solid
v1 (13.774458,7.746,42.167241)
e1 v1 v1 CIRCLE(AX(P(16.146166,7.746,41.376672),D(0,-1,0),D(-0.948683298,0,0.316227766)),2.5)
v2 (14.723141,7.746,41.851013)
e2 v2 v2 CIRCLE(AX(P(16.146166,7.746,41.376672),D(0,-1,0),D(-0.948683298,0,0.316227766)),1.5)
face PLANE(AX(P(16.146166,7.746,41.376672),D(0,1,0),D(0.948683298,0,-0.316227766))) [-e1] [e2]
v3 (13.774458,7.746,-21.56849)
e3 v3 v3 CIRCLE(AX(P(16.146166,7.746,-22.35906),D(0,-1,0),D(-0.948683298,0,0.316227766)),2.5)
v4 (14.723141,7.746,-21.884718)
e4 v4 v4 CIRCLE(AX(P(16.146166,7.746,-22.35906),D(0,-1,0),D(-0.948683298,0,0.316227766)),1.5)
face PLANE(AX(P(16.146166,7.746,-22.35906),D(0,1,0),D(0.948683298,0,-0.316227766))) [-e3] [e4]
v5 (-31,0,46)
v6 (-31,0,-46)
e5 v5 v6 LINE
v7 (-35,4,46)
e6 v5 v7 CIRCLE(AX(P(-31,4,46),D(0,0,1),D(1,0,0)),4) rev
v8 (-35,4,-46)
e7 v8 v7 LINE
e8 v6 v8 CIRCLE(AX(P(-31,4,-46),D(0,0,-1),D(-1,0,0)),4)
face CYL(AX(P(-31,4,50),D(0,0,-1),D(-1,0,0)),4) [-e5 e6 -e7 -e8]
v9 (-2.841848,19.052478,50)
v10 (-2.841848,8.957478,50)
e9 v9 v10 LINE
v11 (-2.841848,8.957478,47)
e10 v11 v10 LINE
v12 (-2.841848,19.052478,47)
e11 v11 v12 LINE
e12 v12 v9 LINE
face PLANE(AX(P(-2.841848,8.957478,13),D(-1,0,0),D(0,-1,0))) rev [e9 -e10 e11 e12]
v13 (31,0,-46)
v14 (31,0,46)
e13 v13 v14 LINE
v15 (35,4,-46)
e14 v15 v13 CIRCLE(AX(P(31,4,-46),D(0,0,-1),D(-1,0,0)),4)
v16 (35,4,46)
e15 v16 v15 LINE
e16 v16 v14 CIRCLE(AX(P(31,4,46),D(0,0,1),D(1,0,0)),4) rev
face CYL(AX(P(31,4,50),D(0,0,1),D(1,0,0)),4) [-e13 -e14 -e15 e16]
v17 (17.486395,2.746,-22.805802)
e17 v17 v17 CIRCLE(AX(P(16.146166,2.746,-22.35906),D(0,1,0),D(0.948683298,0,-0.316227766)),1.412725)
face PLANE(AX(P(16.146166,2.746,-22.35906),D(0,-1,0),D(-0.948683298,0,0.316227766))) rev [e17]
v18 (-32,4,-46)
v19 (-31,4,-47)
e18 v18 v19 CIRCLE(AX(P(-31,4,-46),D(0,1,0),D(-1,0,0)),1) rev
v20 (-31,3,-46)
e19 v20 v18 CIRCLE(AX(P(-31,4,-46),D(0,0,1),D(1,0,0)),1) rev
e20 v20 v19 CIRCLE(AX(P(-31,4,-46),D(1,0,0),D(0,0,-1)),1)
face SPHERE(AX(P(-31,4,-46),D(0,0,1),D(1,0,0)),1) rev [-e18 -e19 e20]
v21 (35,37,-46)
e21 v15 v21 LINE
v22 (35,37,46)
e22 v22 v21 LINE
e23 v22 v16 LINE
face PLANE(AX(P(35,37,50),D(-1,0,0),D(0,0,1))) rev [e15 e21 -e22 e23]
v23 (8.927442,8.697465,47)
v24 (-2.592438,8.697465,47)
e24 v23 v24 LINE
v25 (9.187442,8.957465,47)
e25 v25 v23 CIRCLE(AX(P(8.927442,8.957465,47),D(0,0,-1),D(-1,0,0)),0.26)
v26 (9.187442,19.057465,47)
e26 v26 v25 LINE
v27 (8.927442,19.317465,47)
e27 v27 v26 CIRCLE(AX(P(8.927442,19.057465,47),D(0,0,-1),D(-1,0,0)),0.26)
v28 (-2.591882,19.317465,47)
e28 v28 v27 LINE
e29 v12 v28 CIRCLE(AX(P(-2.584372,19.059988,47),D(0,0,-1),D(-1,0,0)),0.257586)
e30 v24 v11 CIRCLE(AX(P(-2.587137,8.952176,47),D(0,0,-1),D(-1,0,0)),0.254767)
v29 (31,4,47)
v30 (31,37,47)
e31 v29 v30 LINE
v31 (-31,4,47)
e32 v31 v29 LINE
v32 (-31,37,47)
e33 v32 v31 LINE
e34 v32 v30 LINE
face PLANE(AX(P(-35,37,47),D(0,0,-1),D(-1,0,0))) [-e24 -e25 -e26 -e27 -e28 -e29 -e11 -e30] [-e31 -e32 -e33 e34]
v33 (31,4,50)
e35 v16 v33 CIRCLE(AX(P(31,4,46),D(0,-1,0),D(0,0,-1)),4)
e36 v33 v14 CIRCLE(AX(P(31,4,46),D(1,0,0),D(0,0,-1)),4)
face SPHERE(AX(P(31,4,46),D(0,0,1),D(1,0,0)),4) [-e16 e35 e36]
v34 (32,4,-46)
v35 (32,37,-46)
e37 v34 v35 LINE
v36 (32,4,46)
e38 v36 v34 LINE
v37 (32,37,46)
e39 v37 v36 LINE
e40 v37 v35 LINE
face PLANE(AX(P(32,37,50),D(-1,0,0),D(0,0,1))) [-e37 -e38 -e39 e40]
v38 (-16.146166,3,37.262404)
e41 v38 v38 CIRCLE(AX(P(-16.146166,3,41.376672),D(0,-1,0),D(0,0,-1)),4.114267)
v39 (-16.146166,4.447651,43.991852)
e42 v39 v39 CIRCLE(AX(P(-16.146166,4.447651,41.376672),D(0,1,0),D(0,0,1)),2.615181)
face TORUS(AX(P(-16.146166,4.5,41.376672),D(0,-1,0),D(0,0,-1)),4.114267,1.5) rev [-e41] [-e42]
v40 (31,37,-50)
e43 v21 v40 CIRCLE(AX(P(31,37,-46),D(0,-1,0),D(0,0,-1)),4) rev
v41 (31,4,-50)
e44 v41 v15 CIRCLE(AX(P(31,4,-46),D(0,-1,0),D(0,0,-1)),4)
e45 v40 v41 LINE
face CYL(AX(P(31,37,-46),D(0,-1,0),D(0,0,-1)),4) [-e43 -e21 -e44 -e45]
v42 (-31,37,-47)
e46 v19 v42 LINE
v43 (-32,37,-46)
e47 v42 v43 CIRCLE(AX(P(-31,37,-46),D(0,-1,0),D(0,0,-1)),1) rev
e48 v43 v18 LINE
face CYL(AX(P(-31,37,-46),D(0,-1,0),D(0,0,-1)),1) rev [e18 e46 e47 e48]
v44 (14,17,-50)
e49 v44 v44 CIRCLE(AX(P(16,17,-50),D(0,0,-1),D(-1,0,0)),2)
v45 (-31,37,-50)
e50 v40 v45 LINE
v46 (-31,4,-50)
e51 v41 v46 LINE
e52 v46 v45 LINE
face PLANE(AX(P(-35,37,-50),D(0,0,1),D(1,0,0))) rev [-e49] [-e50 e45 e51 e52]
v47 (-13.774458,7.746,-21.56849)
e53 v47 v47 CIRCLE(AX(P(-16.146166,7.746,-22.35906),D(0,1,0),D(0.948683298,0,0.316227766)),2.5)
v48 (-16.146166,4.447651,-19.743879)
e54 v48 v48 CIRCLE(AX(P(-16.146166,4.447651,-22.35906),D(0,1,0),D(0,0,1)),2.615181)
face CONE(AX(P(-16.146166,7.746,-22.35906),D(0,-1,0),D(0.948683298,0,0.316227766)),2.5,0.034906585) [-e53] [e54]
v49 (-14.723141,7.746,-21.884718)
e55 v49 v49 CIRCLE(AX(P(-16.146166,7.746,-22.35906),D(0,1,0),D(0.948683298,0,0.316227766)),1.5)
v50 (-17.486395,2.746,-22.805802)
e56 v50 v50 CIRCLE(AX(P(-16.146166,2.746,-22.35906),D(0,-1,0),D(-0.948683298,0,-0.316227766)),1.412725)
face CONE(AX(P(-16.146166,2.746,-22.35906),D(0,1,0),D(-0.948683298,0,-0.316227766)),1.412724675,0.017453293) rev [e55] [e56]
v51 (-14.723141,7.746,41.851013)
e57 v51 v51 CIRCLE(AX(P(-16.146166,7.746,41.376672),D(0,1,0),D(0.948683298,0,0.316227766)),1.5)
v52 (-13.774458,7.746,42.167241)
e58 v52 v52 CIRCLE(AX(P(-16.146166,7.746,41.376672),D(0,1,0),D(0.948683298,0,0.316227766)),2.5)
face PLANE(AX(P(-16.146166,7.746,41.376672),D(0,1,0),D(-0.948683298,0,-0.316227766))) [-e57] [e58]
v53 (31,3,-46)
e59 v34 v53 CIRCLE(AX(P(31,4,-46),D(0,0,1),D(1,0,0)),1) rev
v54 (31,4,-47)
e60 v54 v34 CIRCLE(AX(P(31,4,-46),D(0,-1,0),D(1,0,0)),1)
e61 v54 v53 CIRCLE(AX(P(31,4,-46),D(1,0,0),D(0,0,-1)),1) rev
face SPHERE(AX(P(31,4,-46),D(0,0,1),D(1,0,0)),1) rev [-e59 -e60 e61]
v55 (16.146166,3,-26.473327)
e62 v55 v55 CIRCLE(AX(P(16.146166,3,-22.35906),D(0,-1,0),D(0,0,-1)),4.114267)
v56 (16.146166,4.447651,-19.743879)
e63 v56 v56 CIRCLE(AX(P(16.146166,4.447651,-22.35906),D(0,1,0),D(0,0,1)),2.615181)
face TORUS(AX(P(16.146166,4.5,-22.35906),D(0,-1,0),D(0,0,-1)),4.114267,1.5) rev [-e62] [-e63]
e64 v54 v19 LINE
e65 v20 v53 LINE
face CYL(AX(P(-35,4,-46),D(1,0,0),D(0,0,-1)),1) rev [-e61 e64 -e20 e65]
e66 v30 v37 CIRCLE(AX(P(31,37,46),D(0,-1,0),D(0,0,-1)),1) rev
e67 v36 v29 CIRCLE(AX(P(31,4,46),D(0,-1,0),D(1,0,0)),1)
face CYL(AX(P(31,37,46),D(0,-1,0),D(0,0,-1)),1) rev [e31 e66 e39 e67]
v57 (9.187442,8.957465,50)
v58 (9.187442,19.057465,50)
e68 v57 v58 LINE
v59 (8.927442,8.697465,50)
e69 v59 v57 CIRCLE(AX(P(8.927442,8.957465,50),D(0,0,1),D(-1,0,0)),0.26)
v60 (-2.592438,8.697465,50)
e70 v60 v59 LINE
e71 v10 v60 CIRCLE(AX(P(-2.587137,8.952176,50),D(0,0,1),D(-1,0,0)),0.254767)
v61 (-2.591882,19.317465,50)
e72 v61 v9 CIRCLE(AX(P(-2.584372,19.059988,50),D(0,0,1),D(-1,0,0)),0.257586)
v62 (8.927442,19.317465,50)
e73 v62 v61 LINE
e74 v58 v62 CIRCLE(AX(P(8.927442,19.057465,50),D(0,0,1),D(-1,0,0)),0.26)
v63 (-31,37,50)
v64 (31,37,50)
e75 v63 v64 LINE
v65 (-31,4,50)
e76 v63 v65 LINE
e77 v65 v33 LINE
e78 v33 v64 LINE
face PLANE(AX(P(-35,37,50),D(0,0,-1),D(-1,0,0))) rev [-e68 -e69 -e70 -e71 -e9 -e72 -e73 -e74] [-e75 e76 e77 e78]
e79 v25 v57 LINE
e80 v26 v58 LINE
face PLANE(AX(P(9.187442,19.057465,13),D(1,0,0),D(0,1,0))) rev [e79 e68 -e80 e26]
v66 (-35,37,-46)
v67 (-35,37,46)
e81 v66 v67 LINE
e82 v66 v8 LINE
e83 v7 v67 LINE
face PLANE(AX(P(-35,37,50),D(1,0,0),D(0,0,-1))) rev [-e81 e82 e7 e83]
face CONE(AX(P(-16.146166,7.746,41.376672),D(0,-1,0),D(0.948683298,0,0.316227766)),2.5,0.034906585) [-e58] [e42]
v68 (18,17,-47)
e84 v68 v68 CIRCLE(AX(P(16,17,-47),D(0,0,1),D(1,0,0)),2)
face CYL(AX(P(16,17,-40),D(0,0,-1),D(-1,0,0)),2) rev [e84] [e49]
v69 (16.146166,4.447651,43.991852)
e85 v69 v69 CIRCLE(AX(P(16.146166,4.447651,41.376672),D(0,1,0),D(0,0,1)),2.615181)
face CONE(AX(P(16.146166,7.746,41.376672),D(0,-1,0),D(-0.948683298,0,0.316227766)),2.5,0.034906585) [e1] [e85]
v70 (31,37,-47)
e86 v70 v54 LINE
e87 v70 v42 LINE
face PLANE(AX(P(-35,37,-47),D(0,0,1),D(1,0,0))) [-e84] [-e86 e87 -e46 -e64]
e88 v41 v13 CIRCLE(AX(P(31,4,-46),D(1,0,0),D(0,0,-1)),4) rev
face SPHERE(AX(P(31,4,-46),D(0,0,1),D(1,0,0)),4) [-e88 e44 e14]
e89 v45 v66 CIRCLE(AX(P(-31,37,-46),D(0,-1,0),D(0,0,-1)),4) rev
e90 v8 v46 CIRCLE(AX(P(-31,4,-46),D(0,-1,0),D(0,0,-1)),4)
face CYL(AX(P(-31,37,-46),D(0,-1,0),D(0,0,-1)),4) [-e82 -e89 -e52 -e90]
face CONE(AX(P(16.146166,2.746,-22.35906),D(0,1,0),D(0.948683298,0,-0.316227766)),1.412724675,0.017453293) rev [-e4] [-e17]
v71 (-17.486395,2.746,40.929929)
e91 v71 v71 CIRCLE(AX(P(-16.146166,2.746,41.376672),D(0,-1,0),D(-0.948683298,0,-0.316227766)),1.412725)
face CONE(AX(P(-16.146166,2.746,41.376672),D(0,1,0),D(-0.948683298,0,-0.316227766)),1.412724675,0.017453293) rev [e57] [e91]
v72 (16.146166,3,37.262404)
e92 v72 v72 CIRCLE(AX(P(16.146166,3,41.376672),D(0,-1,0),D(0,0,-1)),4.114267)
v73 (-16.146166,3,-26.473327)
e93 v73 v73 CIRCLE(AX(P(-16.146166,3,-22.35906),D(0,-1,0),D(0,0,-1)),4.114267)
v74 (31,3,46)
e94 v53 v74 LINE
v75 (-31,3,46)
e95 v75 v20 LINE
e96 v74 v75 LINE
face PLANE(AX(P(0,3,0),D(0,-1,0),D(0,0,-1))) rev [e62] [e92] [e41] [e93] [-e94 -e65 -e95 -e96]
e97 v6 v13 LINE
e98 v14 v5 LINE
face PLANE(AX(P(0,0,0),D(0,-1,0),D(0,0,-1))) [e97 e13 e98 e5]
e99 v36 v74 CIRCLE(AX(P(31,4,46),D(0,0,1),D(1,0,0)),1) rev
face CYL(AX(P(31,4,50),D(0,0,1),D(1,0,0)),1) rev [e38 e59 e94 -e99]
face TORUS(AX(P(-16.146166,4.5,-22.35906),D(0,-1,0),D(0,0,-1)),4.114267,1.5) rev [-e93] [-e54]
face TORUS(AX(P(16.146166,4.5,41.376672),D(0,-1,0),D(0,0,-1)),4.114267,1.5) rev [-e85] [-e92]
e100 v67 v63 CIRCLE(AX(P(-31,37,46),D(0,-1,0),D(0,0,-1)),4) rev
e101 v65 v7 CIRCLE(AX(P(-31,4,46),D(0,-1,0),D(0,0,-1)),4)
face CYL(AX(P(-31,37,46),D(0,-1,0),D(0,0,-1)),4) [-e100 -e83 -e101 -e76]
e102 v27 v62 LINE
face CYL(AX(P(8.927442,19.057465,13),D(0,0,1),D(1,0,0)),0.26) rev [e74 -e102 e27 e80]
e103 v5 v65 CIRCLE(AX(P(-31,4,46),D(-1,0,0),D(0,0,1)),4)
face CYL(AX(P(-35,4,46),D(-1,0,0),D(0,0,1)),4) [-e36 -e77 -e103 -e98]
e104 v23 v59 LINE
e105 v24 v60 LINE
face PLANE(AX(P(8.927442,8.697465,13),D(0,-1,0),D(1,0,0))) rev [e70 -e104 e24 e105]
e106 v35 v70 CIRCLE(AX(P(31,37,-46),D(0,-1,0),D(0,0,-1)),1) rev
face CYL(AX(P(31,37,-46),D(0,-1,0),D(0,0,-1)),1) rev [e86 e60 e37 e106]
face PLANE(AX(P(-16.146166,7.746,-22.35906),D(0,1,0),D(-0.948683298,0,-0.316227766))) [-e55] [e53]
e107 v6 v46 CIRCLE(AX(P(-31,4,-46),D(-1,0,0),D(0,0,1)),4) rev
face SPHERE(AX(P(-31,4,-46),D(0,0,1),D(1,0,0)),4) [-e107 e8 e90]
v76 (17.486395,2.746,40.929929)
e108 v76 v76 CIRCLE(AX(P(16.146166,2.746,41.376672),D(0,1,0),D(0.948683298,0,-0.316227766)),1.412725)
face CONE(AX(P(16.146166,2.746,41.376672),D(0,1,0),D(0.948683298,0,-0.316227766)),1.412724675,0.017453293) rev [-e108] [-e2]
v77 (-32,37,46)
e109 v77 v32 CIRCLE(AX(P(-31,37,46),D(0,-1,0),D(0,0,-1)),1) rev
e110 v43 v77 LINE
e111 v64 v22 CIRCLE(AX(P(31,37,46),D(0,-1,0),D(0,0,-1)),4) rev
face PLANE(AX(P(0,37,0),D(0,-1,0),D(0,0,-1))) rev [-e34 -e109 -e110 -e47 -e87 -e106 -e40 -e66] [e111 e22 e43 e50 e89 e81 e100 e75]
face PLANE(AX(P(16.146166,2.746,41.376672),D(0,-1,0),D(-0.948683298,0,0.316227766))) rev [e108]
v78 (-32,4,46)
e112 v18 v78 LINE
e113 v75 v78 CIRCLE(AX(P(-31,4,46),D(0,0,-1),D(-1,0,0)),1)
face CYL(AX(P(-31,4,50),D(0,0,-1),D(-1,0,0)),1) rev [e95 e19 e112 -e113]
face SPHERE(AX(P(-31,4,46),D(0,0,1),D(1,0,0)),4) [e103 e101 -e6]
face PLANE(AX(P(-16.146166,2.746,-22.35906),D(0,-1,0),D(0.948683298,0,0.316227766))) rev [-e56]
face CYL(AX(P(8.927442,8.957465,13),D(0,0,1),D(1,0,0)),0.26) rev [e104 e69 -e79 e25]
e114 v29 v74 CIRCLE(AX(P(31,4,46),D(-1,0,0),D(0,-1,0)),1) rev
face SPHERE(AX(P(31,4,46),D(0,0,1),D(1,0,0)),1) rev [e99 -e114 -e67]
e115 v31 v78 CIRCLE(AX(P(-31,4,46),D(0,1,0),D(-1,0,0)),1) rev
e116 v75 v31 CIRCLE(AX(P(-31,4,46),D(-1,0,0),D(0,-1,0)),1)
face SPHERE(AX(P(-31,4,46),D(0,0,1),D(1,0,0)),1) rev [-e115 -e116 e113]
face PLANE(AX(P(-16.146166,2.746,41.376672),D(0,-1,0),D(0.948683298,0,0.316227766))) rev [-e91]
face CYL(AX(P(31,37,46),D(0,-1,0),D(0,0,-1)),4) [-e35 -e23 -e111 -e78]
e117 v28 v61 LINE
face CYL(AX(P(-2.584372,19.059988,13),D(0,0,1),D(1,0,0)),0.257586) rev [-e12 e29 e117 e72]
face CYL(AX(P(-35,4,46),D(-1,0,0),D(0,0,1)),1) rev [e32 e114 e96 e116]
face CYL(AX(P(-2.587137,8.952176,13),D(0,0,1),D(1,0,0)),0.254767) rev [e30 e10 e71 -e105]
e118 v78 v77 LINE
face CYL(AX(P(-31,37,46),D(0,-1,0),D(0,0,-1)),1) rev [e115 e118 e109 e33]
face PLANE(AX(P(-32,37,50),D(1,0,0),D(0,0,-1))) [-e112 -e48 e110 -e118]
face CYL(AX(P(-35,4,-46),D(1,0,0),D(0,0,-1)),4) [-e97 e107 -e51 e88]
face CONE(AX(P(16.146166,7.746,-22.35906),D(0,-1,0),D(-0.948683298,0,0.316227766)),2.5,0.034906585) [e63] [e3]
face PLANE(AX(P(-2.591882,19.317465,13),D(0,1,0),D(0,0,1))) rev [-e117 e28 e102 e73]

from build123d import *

# Parameters (mm, degrees)
SKETCH_100X70_W                     = 70
SKETCH_100X70_H                     = 100
BOSS_EXTRUDE_MAINBOX_37MM_DEPTH     = 37
FILLET_MAINOUTSIDEFILLET_4MM_R      = 4
SHELL_MAINSHELL_3MM_T               = -3
CUT_EXTRUDE_USB_B_PORT_IN_PCB_DEPTH = 37
CUT_EXTRUDE_WIRESOUT_DEPTH          = 10
FILLET_FORMOUNTINGBOSSINPCB_R       = 1.5


# Read off the part's stored shape, not the designer's step: Mounting Boss-PCBMount1, Mounting Boss-PCBMount3
with BuildPart() as part:
    # Sketch-100x70 → Boss-Extrude-MainBox 37mm (new body)
    with BuildSketch(Plane(origin=(0, 0, 0), x_dir=(1, 0, 0), z_dir=(0, 1, 0))):
        Rectangle(SKETCH_100X70_W, SKETCH_100X70_H)
    extrude(amount=BOSS_EXTRUDE_MAINBOX_37MM_DEPTH)

    # Fillet-MainOutSideFillet 4mm
    fillet_mainoutsidefillet_4mm_edges = [part.edges().sort_by_distance(p)[0] for p in [
        (0, 0, 50),
        (-35, 0, 0),
        (0, 0, -50),
        (35, 0, 0),
        (35, 18.5, 50),
        (-35, 18.5, 50),
        (-35, 18.5, -50),
        (35, 18.5, -50),
    ]]
    fillet(fillet_mainoutsidefillet_4mm_edges, radius=FILLET_MAINOUTSIDEFILLET_4MM_R)

    # Shell-MainShell 3mm
    shell_mainshell_3mm_openings = [part.faces().sort_by_distance(p)[0] for p in [
        (0, 37, 0),
    ]]
    offset(amount=SHELL_MAINSHELL_3MM_T, openings=shell_mainshell_3mm_openings, kind=Kind.INTERSECTION)

    # Mounting Boss-PCBMount1 outline → Mounting Boss-PCBMount1 (revolve, cut)
    with BuildSketch(Plane(origin=(16.146166208, 0, -22.359059727), x_dir=(1, 0, 0), z_dir=(0, 0, 1))):
        Polygon((1.412724675, 2.746), (1.417158262, 3), (0, 3), (0, 2.746), align=None)
    mounting_boss_pcbmount1 = revolve(axis=Axis((16.146166208, 0, -22.359059727), (0, 1, 0)), mode=Mode.SUBTRACT)

    # Mounting Boss-PCBMount1 2 outline → Mounting Boss-PCBMount1 2 (revolve)
    with BuildSketch(Plane(origin=(16.146166208, 0, -22.359059727), x_dir=(1, 0, 0), z_dir=(0, 0, 1))):
        Polygon((2.5, 7.746), (1.5, 7.746), (1.417158262, 3), (2.665733972, 3), align=None)
    mounting_boss_pcbmount1_2 = revolve(axis=Axis((16.146166208, 0, -22.359059727), (0, 1, 0)))

    # Mounting Boss-PCBMount3 outline → Mounting Boss-PCBMount3 (revolve, cut)
    with BuildSketch(Plane(origin=(16.146166208, 0, 41.376671572), x_dir=(1, 0, 0), z_dir=(0, 0, 1))):
        Polygon((1.412724675, 2.746), (1.417158262, 3), (0, 3), (0, 2.746), align=None)
    mounting_boss_pcbmount3 = revolve(axis=Axis((16.146166208, 0, 41.376671572), (0, 1, 0)), mode=Mode.SUBTRACT)

    # Mounting Boss-PCBMount3 2 outline → Mounting Boss-PCBMount3 2 (revolve)
    with BuildSketch(Plane(origin=(16.146166208, 0, 41.376671572), x_dir=(1, 0, 0), z_dir=(0, 0, 1))):
        Polygon((2.5, 7.746), (1.5, 7.746), (1.417158262, 3), (2.665733972, 3), align=None)
    mounting_boss_pcbmount3_2 = revolve(axis=Axis((16.146166208, 0, 41.376671572), (0, 1, 0)))

    # Mirror-PCBMount2and4: Mounting Boss-PCBMount1, Mounting Boss-PCBMount1 2, Mounting Boss-PCBMount3, Mounting Boss-PCBMount3 2 across plane
    add(mounting_boss_pcbmount1.mirror(Plane(origin=(0, 0, 0), x_dir=(0, 0, 1), z_dir=(1, 0, 0))), mode=Mode.SUBTRACT)
    add(mounting_boss_pcbmount1_2.mirror(Plane(origin=(0, 0, 0), x_dir=(0, 0, 1), z_dir=(1, 0, 0))))
    add(mounting_boss_pcbmount3.mirror(Plane(origin=(0, 0, 0), x_dir=(0, 0, 1), z_dir=(1, 0, 0))), mode=Mode.SUBTRACT)
    add(mounting_boss_pcbmount3_2.mirror(Plane(origin=(0, 0, 0), x_dir=(0, 0, 1), z_dir=(1, 0, 0))))

    # Sketch-USB-B-Port → Cut-Extrude-USB-B-Port-In-PCB (cut)
    with BuildSketch(Plane.XY.offset(50)):
        with BuildLine():
            Line((-2.59188207, 19.317464921), (8.927441523, 19.317464921))
            ThreePointArc((8.927441523, 19.317464921), (9.111289286, 19.241312685), (9.187441523, 19.057464921))
            Line((9.187441523, 19.057464921), (9.187441523, 8.957464936))
            ThreePointArc((9.187441523, 8.957464936), (9.111289286, 8.773617173), (8.927441523, 8.697464936))
            Line((8.927441523, 8.697464936), (-2.592438211, 8.697464936))
            ThreePointArc((-2.592438211, 8.697464936), (-2.770993678, 8.775816965), (-2.841848208, 8.957477997))
            Line((-2.841848208, 8.957477997), (-2.841848208, 19.052478011))
            ThreePointArc((-2.841848208, 19.052478011), (-2.771745725, 19.236741148), (-2.59188207, 19.317464921))
        make_face()
    extrude(amount=-CUT_EXTRUDE_USB_B_PORT_IN_PCB_DEPTH, mode=Mode.SUBTRACT)

    # Sketch-WiresOutForModule → Cut-Extrude-WiresOut (cut)
    with BuildSketch(Plane(origin=(0, 0, -50), x_dir=(-1, 0, 0), z_dir=(0, 0, -1))):
        with BuildLine():
            ThreePointArc((-14, 17), (-14.585786438, 18.414213562), (-16, 19))
            Line((-16, 19), (-16, 17))
            Line((-16, 17), (-18, 17))
            ThreePointArc((-18, 17), (-16, 15), (-14, 17))
        make_face()
        with BuildLine():
            Line((-16, 17), (-16, 19))
            ThreePointArc((-16, 19), (-17.414213562, 18.414213562), (-18, 17))
            Line((-18, 17), (-16, 17))
        make_face()
    extrude(amount=-CUT_EXTRUDE_WIRESOUT_DEPTH, mode=Mode.SUBTRACT)

    # Fillet-ForMountingBossInPCB
    fillet_formountingbossinpcb_edges = [part.edges().sort_by_distance(p)[0] for p in [
        (13.480432236, 3, -22.359059727),
        (13.480432236, 3, 41.376671572),
        (-13.480432236, 3, 41.376671572),
        (-13.480432236, 3, -22.359059727),
    ]]
    fillet(fillet_formountingbossinpcb_edges, radius=FILLET_FORMOUNTINGBOSSINPCB_R)


solid = part.part
